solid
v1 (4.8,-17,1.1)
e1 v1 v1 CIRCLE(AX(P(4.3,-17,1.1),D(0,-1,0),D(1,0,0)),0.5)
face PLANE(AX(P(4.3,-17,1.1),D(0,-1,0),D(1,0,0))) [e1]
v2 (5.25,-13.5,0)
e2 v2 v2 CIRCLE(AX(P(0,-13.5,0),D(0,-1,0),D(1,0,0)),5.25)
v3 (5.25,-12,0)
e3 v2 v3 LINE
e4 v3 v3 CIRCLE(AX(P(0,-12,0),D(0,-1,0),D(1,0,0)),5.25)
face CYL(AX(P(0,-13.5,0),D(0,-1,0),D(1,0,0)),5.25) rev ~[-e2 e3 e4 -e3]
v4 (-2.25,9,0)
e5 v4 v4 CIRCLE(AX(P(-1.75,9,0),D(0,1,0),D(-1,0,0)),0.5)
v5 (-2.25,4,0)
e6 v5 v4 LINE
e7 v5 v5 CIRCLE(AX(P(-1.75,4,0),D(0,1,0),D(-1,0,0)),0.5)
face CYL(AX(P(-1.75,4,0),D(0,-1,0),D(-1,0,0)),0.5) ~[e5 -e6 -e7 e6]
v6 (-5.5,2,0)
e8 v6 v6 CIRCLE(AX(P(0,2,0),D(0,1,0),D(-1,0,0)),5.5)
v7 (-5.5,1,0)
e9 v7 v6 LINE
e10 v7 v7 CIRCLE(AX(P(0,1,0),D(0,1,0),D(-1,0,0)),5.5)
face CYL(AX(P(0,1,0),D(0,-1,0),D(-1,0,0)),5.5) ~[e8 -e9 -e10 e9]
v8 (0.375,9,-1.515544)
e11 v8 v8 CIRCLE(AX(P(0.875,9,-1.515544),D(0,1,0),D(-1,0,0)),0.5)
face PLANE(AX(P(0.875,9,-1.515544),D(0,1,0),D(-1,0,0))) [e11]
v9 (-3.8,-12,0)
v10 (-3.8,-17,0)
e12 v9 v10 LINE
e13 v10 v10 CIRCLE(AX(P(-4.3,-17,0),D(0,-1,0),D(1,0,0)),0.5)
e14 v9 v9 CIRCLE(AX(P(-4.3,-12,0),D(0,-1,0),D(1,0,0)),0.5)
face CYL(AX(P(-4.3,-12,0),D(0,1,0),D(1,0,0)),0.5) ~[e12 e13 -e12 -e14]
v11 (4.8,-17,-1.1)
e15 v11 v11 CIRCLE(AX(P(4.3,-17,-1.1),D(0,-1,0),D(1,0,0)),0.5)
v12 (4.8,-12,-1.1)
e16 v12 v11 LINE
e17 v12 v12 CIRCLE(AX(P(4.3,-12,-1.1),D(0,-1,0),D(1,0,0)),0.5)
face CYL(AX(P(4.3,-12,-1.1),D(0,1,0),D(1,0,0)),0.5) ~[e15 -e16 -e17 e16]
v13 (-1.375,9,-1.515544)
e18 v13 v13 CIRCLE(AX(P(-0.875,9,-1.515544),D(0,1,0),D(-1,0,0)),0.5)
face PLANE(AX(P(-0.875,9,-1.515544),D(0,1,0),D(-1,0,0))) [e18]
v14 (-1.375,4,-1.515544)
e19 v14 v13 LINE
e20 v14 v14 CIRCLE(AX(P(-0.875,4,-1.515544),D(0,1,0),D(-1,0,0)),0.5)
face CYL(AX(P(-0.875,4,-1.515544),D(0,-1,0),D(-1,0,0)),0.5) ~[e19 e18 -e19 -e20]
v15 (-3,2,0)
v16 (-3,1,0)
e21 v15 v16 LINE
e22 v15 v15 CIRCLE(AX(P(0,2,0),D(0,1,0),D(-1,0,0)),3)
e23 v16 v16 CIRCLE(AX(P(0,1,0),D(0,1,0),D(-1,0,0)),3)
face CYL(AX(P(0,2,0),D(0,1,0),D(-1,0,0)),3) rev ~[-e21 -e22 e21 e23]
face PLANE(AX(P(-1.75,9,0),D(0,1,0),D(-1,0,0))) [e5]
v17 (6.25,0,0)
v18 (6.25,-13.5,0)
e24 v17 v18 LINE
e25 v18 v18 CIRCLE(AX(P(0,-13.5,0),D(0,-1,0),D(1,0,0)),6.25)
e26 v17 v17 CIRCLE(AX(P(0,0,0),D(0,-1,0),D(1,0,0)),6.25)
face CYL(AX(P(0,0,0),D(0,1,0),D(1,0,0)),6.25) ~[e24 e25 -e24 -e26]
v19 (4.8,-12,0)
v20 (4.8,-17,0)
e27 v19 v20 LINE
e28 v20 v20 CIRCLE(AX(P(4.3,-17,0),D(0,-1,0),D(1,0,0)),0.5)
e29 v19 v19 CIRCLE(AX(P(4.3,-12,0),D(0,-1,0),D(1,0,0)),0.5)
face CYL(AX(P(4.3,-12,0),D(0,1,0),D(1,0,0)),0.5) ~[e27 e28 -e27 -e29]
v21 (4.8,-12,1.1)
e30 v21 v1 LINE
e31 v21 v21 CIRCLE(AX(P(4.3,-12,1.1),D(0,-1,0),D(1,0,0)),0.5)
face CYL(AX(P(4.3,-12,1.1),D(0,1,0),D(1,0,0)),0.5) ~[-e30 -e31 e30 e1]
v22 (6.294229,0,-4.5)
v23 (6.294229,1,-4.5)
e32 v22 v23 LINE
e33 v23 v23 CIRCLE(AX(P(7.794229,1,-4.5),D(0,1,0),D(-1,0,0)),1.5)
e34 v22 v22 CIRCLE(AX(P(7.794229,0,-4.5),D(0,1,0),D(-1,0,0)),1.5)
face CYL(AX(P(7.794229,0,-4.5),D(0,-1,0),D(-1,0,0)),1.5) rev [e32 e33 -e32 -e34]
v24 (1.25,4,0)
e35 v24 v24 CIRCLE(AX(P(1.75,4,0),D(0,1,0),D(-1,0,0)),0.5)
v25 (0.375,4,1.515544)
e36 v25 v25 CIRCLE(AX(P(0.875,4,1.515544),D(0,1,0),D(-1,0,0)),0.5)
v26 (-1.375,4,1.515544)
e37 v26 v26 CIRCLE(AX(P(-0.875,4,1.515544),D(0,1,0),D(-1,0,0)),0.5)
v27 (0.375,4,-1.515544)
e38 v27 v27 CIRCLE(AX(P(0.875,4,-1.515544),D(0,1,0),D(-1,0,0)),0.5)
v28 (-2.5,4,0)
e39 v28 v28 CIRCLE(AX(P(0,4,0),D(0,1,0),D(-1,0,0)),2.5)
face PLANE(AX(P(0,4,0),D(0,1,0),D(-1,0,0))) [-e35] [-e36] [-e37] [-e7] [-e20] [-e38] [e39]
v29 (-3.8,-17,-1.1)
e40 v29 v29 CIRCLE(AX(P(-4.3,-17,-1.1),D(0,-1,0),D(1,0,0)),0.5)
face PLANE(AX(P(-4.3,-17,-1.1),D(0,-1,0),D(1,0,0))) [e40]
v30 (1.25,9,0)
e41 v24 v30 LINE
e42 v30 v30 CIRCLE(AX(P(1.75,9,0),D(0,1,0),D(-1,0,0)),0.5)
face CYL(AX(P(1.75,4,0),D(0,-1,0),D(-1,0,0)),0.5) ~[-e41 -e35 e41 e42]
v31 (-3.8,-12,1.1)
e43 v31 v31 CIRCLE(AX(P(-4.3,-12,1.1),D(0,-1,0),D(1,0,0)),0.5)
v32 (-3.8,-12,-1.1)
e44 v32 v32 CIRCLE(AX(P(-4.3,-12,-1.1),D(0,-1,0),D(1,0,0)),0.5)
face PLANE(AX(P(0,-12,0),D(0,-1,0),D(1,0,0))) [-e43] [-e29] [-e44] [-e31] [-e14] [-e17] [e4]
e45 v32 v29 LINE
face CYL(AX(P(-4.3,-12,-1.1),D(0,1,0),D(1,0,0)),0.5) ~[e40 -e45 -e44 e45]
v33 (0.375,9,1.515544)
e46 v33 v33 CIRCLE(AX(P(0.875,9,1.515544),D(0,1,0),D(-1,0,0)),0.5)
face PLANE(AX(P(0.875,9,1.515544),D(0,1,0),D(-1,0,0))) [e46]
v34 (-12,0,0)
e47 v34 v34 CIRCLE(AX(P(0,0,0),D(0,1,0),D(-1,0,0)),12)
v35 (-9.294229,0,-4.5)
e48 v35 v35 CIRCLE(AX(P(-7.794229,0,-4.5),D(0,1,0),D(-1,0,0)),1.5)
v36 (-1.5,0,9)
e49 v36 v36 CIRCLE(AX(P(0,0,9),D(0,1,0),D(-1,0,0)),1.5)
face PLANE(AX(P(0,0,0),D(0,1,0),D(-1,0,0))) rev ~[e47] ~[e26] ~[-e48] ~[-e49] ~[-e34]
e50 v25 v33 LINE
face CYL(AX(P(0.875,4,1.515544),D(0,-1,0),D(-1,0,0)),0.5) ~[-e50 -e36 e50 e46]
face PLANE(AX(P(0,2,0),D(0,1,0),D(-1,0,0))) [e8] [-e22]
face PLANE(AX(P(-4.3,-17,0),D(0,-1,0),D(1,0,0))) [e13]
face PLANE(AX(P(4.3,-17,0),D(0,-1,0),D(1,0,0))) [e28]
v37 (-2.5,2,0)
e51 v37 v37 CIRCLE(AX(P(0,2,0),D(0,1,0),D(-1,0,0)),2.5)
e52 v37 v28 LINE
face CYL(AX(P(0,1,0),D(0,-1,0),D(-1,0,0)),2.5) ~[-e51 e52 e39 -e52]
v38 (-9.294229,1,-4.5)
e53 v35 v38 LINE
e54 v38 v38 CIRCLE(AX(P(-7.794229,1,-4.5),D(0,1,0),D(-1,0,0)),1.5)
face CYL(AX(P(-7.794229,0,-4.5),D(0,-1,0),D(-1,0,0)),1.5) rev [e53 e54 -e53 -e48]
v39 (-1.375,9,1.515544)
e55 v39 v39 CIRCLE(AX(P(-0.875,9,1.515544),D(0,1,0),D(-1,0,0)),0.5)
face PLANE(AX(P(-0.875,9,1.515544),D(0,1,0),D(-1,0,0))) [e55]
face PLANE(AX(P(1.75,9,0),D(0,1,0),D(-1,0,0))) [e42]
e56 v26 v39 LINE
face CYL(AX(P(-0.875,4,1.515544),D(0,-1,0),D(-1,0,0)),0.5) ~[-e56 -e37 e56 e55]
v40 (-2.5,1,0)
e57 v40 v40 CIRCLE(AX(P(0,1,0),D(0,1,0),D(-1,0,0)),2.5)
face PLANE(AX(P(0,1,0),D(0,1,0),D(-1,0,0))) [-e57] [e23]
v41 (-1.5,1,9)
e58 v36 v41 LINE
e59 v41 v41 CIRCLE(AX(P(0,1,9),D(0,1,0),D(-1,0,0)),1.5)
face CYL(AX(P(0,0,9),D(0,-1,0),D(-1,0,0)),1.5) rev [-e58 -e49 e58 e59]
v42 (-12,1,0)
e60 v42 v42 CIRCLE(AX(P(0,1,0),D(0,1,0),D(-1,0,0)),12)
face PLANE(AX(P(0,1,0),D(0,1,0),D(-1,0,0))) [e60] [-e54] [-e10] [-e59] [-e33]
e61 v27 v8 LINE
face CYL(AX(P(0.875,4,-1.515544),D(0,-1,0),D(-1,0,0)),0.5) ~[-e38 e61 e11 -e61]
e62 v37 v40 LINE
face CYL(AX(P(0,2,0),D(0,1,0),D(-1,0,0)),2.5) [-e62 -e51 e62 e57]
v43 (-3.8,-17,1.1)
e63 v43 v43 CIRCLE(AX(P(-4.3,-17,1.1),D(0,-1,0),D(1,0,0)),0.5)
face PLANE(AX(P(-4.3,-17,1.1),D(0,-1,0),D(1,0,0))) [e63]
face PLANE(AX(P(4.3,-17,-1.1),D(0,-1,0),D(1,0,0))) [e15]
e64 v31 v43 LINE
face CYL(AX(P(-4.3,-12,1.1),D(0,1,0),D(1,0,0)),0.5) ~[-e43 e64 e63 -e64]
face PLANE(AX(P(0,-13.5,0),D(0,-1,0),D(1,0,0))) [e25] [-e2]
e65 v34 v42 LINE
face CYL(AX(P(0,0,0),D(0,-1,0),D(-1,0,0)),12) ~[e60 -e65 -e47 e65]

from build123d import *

# Parameters (mm, degrees)
F0_R      = 6.25
F1_DEPTH  = 13.5
F2_R      = 12
F2_R_2    = 1.5
F2_R_3    = 6.25
F3_DEPTH  = 1
F4_R      = 5.5
F4_R_2    = 2.5
F5_DEPTH  = 1
F6_DEPTH  = 3
F7_R      = 3
F7_R_2    = 2.5
F8_DEPTH  = 1
F9_R      = 5.25
F10_DEPTH = 1.5
F11_R     = 0.5
F12_DEPTH = 5
F13_R     = 0.5
F14_DEPTH = 5


with BuildPart() as f1:
    # F0 (on Front) → F1 (new body)
    with BuildSketch(Plane.XZ):
        Circle(F0_R)
    extrude(amount=F1_DEPTH)

    # F2 (on face) → F3 (join)
    with BuildSketch(Plane(origin=(0, 0, 0), x_dir=(-1, 0, 0), z_dir=(0, 1, 0))):
        Circle(F2_R)
        with Locations((-7.7942286341, -4.5)):
            Circle(F2_R_2, mode=Mode.SUBTRACT)
        with Locations((7.7942286341, -4.5)):
            Circle(F2_R_2, mode=Mode.SUBTRACT)
        Circle(F2_R_3, mode=Mode.SUBTRACT)
        with Locations((0, 9)):
            Circle(F2_R_2, mode=Mode.SUBTRACT)
        Circle(F2_R_3)
    extrude(amount=F3_DEPTH)

    # F4 (on face) → F5 (join)
    with BuildSketch(Plane(origin=(0, 1, 0), x_dir=(-1, 0, 0), z_dir=(0, 1, 0))):
        Circle(F4_R)
        Circle(F4_R_2, mode=Mode.SUBTRACT)
    extrude(amount=F5_DEPTH)

    # F6 (add): a face of the model
    f6_faces = [f1.faces().sort_by_distance(p)[0] for p in [
        (0, 1, 0),
    ]]
    extrude(f6_faces, amount=F6_DEPTH)

    # F7 (on face) → F8 (cut)
    with BuildSketch(Plane(origin=(0, 2, 0), x_dir=(-1, 0, 0), z_dir=(0, 1, 0))):
        Circle(F7_R)
        Circle(F7_R_2, mode=Mode.SUBTRACT)
    extrude(amount=-F8_DEPTH, mode=Mode.SUBTRACT)

    # F9 (on face) → F10 (cut)
    with BuildSketch(Plane.XZ.offset(13.5)):
        Circle(F9_R)
    extrude(amount=-F10_DEPTH, mode=Mode.SUBTRACT)

    # F11 (on face) → F12 (join)
    with BuildSketch(Plane.XZ.offset(12)):
        with Locations((-4.3, -1.1)):
            Circle(F11_R)
        with Locations((-4.3, 0)):
            Circle(F11_R)
        with Locations((-4.3, 1.1)):
            Circle(F11_R)
        with Locations((4.3, 1.1)):
            Circle(F11_R)
        with Locations((4.3, 0)):
            Circle(F11_R)
        with Locations((4.3, -1.1)):
            Circle(F11_R)
    extrude(amount=F12_DEPTH)

    # F13 (on face) → F14 (join)
    with BuildSketch(Plane(origin=(0, 4, 0), x_dir=(-1, 0, 0), z_dir=(0, 1, 0))):
        with Locations((-0.875, -1.5155444566)):
            Circle(F13_R)
        with Locations((0.875, -1.5155444566)):
            Circle(F13_R)
        with Locations((1.75, 0)):
            Circle(F13_R)
        with Locations((0.875, 1.5155444566)):
            Circle(F13_R)
        with Locations((-0.875, 1.5155444566)):
            Circle(F13_R)
        with Locations((-1.75, 0)):
            Circle(F13_R)
    extrude(amount=F14_DEPTH)


solid = f1.part
